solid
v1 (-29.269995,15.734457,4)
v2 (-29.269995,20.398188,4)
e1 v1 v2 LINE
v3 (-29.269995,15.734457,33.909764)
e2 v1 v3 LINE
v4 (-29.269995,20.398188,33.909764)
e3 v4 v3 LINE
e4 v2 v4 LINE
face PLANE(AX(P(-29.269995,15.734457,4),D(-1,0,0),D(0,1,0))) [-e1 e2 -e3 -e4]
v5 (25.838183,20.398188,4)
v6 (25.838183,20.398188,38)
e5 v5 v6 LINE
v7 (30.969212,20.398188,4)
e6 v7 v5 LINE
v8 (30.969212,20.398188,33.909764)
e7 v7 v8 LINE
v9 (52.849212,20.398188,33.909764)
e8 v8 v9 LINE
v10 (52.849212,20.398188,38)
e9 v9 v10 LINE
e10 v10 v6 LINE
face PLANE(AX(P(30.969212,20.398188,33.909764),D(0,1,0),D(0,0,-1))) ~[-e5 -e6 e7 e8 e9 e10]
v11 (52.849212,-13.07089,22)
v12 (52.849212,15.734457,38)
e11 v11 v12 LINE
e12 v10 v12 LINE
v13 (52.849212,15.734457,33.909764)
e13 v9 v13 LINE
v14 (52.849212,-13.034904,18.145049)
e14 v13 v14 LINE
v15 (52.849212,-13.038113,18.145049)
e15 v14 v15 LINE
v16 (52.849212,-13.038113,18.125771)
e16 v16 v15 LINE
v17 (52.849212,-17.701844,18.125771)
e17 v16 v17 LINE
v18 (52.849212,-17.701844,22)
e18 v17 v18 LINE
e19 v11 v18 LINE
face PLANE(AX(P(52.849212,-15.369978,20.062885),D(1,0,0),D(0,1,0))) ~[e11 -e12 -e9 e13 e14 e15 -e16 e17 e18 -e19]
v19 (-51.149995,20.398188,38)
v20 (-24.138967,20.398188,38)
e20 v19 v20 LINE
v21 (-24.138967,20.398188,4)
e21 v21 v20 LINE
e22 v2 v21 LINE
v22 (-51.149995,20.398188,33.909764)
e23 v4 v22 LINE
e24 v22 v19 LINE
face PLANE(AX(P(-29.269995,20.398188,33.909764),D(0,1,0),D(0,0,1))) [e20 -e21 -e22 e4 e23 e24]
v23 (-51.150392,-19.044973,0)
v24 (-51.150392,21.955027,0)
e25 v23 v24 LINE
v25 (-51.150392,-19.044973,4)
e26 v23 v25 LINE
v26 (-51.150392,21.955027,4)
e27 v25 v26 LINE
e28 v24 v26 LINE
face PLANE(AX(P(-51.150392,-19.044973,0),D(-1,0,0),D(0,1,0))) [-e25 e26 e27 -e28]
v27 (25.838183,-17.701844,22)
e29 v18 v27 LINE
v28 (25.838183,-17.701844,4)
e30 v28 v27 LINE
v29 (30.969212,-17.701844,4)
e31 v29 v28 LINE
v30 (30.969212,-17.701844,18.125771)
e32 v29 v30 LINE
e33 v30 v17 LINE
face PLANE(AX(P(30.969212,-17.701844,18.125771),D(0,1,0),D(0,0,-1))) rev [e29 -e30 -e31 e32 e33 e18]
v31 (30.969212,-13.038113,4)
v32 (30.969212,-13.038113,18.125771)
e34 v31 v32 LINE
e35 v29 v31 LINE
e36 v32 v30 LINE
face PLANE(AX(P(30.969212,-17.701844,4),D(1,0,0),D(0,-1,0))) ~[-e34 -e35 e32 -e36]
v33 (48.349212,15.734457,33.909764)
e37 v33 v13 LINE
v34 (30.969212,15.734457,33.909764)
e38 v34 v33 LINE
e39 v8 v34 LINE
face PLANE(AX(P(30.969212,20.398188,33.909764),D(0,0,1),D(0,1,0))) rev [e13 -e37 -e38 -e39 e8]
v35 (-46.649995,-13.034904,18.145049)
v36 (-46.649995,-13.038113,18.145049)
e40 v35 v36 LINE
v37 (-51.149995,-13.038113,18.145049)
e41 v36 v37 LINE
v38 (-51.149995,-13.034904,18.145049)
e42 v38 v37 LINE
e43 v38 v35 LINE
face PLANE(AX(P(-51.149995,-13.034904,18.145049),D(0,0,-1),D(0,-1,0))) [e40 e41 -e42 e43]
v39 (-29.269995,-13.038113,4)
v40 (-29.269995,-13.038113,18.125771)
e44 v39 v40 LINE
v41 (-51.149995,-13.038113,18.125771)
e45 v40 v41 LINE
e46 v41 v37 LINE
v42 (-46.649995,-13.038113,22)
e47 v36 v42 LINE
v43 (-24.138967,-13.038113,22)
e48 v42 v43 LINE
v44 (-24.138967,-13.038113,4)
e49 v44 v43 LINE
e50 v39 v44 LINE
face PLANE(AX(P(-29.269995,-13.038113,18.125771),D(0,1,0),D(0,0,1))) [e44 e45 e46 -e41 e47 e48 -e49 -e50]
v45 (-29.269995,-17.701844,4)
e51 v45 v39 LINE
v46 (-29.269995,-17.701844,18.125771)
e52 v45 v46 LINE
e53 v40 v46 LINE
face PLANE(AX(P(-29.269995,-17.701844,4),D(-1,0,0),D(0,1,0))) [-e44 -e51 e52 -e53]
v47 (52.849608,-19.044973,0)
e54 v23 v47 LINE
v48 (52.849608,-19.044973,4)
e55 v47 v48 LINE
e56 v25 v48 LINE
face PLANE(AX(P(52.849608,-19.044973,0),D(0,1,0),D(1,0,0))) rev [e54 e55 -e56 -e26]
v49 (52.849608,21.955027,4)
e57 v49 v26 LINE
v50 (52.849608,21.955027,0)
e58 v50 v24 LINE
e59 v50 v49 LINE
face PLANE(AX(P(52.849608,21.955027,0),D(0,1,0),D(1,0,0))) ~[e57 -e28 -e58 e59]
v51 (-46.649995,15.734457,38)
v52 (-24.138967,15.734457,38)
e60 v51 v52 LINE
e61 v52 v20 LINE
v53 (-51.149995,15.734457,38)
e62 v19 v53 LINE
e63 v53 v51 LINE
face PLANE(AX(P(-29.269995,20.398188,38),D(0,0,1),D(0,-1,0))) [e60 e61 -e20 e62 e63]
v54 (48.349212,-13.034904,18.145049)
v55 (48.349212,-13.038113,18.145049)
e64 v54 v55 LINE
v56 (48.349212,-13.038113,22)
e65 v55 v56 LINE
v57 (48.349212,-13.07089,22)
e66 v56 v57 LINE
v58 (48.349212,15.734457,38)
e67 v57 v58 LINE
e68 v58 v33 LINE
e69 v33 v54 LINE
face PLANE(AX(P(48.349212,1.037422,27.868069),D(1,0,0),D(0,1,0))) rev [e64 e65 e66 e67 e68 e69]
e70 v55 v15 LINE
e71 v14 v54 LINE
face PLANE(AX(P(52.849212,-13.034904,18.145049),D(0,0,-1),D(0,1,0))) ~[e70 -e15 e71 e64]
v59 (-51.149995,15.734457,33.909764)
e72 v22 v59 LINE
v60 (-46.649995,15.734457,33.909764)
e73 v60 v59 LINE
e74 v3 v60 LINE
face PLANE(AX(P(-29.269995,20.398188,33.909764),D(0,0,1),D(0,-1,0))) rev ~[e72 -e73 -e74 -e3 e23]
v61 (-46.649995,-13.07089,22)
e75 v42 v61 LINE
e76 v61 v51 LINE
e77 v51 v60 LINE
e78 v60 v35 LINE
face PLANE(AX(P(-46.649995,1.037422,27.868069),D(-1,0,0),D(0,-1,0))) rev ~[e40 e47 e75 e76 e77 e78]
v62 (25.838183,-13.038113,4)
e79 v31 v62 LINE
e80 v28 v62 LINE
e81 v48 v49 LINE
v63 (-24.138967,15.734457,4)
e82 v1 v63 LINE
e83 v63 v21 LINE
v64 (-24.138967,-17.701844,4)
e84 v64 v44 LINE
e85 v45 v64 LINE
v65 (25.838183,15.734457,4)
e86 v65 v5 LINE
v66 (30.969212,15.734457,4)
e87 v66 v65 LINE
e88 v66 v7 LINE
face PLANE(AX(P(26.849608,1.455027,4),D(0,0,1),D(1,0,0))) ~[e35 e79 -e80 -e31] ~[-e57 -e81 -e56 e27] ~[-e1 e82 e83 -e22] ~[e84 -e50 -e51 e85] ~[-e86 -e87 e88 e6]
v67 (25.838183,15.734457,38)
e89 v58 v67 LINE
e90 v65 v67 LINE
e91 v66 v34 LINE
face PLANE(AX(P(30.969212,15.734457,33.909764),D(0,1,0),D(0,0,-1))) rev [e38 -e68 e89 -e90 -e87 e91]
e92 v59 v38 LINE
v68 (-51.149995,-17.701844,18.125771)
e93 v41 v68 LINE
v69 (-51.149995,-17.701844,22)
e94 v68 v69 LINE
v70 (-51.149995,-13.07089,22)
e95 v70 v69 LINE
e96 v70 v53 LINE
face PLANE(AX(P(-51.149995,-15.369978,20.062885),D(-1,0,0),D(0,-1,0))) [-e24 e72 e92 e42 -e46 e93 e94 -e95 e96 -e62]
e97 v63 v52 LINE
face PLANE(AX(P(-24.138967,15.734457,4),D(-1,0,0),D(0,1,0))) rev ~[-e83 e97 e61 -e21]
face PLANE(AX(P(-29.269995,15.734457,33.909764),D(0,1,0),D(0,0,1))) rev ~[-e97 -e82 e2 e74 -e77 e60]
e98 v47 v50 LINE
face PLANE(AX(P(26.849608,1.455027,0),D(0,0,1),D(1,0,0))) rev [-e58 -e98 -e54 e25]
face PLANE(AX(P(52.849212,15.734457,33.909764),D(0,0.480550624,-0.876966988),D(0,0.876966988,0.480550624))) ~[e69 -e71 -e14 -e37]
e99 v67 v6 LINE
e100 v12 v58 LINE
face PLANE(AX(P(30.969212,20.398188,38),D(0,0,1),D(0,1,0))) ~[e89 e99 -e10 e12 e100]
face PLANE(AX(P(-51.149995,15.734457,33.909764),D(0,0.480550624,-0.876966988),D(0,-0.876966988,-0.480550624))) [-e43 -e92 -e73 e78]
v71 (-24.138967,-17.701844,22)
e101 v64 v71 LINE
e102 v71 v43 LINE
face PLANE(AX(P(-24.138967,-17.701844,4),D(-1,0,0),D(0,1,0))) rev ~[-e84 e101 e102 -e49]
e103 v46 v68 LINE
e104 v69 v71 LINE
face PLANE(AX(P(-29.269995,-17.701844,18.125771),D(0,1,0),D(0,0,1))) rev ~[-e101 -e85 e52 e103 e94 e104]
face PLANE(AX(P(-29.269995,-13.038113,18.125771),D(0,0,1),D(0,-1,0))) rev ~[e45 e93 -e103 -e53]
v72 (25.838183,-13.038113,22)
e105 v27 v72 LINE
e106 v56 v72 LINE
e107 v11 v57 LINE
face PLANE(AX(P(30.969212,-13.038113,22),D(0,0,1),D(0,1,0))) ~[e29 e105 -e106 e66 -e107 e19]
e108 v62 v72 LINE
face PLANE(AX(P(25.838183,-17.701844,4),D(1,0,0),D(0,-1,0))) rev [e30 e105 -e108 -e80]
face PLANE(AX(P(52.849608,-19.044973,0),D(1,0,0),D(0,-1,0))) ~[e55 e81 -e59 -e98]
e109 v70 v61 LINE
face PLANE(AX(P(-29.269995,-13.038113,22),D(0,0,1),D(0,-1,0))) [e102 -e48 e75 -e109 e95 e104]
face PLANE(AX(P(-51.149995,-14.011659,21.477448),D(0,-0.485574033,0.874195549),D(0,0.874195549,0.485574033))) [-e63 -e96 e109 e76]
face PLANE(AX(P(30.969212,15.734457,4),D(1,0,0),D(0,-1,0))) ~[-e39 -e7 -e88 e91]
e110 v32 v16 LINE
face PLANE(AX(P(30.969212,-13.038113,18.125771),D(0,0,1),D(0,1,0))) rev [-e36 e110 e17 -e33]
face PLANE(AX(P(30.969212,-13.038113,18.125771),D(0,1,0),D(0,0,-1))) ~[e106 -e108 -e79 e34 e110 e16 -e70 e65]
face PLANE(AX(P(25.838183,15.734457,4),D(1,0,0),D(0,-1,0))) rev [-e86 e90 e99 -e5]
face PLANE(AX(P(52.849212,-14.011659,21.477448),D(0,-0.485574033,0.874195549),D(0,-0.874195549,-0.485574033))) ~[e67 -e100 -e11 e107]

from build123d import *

# Parameters (mm, degrees)
F0_W      = 52
F0_H      = 41
F1_DEPTH  = 4
F2_W      = 5.1310285926
F2_H      = 4.6637309715
F3_DEPTH  = 34
F4_DEPTH  = 18
F5_W      = 4.6637309715
F5_H      = 4.0902358592
F6_DEPTH  = 21.88
F7_W      = 4.6637309715
F7_H      = 3.8742293864
F8_DEPTH  = 21.88
F10_DEPTH = 4.5


with BuildPart() as f1:
    # F0 (on Top) → F1 (new body)
    with BuildSketch(Plane.XY):
        with Locations((-25.150391832, 1.4550268714)):
            Rectangle(F0_W, F0_H)
    extrude(amount=F1_DEPTH)

    # F2 (on face) → F3 (join)
    with BuildSketch(Plane.XY.offset(4)):
        with Locations((-26.7044808716, 18.0663228966)):
            Rectangle(F2_W, F2_H)
    extrude(amount=F3_DEPTH)

    # F2 (on face) → F4 (join)
    with BuildSketch(Plane.XY.offset(4)):
        with Locations((-26.7044808716, -15.3699782677)):
            Rectangle(F2_W, F2_H)
    extrude(amount=F4_DEPTH)

    # F5 (on face) → F6 (join)
    with BuildSketch(Plane(origin=(-29.2699951679, 0, 0), x_dir=(0, -1, 0), z_dir=(-1, 0, 0))):
        with Locations((-18.0663228966, 35.9548820704)):
            Rectangle(F5_W, F5_H)
    extrude(amount=F6_DEPTH)

    # F7 (on face) → F8 (join)
    with BuildSketch(Plane(origin=(-29.2699951679, 0, 0), x_dir=(0, -1, 0), z_dir=(-1, 0, 0))):
        with Locations((15.3699782677, 20.0628853068)):
            Rectangle(F7_W, F7_H)
    extrude(amount=F8_DEPTH)

    # F9 (on face) → F10 (join)
    with BuildSketch(Plane(origin=(-51.1499951679, 0, 0), x_dir=(0, -1, 0), z_dir=(-1, 0, 0))):
        Polygon((14.0116587281, 21.4774478227), (-15.7344574109, 38), (-15.7344574109, 33.9097641408), (13.0349043757, 18.1450489908), (14.0116587281, 18.1450489908), align=None)
    extrude(amount=-F10_DEPTH)

    # F11: F1 across face


with BuildPart() as f1_1:
    add(f1.part)
    add(f1.part.mirror(Plane(origin=(0.849608168, 1.4550268714, 2), x_dir=(0, 1, 0), z_dir=(1, 0, 0))))


solid = f1_1.part
